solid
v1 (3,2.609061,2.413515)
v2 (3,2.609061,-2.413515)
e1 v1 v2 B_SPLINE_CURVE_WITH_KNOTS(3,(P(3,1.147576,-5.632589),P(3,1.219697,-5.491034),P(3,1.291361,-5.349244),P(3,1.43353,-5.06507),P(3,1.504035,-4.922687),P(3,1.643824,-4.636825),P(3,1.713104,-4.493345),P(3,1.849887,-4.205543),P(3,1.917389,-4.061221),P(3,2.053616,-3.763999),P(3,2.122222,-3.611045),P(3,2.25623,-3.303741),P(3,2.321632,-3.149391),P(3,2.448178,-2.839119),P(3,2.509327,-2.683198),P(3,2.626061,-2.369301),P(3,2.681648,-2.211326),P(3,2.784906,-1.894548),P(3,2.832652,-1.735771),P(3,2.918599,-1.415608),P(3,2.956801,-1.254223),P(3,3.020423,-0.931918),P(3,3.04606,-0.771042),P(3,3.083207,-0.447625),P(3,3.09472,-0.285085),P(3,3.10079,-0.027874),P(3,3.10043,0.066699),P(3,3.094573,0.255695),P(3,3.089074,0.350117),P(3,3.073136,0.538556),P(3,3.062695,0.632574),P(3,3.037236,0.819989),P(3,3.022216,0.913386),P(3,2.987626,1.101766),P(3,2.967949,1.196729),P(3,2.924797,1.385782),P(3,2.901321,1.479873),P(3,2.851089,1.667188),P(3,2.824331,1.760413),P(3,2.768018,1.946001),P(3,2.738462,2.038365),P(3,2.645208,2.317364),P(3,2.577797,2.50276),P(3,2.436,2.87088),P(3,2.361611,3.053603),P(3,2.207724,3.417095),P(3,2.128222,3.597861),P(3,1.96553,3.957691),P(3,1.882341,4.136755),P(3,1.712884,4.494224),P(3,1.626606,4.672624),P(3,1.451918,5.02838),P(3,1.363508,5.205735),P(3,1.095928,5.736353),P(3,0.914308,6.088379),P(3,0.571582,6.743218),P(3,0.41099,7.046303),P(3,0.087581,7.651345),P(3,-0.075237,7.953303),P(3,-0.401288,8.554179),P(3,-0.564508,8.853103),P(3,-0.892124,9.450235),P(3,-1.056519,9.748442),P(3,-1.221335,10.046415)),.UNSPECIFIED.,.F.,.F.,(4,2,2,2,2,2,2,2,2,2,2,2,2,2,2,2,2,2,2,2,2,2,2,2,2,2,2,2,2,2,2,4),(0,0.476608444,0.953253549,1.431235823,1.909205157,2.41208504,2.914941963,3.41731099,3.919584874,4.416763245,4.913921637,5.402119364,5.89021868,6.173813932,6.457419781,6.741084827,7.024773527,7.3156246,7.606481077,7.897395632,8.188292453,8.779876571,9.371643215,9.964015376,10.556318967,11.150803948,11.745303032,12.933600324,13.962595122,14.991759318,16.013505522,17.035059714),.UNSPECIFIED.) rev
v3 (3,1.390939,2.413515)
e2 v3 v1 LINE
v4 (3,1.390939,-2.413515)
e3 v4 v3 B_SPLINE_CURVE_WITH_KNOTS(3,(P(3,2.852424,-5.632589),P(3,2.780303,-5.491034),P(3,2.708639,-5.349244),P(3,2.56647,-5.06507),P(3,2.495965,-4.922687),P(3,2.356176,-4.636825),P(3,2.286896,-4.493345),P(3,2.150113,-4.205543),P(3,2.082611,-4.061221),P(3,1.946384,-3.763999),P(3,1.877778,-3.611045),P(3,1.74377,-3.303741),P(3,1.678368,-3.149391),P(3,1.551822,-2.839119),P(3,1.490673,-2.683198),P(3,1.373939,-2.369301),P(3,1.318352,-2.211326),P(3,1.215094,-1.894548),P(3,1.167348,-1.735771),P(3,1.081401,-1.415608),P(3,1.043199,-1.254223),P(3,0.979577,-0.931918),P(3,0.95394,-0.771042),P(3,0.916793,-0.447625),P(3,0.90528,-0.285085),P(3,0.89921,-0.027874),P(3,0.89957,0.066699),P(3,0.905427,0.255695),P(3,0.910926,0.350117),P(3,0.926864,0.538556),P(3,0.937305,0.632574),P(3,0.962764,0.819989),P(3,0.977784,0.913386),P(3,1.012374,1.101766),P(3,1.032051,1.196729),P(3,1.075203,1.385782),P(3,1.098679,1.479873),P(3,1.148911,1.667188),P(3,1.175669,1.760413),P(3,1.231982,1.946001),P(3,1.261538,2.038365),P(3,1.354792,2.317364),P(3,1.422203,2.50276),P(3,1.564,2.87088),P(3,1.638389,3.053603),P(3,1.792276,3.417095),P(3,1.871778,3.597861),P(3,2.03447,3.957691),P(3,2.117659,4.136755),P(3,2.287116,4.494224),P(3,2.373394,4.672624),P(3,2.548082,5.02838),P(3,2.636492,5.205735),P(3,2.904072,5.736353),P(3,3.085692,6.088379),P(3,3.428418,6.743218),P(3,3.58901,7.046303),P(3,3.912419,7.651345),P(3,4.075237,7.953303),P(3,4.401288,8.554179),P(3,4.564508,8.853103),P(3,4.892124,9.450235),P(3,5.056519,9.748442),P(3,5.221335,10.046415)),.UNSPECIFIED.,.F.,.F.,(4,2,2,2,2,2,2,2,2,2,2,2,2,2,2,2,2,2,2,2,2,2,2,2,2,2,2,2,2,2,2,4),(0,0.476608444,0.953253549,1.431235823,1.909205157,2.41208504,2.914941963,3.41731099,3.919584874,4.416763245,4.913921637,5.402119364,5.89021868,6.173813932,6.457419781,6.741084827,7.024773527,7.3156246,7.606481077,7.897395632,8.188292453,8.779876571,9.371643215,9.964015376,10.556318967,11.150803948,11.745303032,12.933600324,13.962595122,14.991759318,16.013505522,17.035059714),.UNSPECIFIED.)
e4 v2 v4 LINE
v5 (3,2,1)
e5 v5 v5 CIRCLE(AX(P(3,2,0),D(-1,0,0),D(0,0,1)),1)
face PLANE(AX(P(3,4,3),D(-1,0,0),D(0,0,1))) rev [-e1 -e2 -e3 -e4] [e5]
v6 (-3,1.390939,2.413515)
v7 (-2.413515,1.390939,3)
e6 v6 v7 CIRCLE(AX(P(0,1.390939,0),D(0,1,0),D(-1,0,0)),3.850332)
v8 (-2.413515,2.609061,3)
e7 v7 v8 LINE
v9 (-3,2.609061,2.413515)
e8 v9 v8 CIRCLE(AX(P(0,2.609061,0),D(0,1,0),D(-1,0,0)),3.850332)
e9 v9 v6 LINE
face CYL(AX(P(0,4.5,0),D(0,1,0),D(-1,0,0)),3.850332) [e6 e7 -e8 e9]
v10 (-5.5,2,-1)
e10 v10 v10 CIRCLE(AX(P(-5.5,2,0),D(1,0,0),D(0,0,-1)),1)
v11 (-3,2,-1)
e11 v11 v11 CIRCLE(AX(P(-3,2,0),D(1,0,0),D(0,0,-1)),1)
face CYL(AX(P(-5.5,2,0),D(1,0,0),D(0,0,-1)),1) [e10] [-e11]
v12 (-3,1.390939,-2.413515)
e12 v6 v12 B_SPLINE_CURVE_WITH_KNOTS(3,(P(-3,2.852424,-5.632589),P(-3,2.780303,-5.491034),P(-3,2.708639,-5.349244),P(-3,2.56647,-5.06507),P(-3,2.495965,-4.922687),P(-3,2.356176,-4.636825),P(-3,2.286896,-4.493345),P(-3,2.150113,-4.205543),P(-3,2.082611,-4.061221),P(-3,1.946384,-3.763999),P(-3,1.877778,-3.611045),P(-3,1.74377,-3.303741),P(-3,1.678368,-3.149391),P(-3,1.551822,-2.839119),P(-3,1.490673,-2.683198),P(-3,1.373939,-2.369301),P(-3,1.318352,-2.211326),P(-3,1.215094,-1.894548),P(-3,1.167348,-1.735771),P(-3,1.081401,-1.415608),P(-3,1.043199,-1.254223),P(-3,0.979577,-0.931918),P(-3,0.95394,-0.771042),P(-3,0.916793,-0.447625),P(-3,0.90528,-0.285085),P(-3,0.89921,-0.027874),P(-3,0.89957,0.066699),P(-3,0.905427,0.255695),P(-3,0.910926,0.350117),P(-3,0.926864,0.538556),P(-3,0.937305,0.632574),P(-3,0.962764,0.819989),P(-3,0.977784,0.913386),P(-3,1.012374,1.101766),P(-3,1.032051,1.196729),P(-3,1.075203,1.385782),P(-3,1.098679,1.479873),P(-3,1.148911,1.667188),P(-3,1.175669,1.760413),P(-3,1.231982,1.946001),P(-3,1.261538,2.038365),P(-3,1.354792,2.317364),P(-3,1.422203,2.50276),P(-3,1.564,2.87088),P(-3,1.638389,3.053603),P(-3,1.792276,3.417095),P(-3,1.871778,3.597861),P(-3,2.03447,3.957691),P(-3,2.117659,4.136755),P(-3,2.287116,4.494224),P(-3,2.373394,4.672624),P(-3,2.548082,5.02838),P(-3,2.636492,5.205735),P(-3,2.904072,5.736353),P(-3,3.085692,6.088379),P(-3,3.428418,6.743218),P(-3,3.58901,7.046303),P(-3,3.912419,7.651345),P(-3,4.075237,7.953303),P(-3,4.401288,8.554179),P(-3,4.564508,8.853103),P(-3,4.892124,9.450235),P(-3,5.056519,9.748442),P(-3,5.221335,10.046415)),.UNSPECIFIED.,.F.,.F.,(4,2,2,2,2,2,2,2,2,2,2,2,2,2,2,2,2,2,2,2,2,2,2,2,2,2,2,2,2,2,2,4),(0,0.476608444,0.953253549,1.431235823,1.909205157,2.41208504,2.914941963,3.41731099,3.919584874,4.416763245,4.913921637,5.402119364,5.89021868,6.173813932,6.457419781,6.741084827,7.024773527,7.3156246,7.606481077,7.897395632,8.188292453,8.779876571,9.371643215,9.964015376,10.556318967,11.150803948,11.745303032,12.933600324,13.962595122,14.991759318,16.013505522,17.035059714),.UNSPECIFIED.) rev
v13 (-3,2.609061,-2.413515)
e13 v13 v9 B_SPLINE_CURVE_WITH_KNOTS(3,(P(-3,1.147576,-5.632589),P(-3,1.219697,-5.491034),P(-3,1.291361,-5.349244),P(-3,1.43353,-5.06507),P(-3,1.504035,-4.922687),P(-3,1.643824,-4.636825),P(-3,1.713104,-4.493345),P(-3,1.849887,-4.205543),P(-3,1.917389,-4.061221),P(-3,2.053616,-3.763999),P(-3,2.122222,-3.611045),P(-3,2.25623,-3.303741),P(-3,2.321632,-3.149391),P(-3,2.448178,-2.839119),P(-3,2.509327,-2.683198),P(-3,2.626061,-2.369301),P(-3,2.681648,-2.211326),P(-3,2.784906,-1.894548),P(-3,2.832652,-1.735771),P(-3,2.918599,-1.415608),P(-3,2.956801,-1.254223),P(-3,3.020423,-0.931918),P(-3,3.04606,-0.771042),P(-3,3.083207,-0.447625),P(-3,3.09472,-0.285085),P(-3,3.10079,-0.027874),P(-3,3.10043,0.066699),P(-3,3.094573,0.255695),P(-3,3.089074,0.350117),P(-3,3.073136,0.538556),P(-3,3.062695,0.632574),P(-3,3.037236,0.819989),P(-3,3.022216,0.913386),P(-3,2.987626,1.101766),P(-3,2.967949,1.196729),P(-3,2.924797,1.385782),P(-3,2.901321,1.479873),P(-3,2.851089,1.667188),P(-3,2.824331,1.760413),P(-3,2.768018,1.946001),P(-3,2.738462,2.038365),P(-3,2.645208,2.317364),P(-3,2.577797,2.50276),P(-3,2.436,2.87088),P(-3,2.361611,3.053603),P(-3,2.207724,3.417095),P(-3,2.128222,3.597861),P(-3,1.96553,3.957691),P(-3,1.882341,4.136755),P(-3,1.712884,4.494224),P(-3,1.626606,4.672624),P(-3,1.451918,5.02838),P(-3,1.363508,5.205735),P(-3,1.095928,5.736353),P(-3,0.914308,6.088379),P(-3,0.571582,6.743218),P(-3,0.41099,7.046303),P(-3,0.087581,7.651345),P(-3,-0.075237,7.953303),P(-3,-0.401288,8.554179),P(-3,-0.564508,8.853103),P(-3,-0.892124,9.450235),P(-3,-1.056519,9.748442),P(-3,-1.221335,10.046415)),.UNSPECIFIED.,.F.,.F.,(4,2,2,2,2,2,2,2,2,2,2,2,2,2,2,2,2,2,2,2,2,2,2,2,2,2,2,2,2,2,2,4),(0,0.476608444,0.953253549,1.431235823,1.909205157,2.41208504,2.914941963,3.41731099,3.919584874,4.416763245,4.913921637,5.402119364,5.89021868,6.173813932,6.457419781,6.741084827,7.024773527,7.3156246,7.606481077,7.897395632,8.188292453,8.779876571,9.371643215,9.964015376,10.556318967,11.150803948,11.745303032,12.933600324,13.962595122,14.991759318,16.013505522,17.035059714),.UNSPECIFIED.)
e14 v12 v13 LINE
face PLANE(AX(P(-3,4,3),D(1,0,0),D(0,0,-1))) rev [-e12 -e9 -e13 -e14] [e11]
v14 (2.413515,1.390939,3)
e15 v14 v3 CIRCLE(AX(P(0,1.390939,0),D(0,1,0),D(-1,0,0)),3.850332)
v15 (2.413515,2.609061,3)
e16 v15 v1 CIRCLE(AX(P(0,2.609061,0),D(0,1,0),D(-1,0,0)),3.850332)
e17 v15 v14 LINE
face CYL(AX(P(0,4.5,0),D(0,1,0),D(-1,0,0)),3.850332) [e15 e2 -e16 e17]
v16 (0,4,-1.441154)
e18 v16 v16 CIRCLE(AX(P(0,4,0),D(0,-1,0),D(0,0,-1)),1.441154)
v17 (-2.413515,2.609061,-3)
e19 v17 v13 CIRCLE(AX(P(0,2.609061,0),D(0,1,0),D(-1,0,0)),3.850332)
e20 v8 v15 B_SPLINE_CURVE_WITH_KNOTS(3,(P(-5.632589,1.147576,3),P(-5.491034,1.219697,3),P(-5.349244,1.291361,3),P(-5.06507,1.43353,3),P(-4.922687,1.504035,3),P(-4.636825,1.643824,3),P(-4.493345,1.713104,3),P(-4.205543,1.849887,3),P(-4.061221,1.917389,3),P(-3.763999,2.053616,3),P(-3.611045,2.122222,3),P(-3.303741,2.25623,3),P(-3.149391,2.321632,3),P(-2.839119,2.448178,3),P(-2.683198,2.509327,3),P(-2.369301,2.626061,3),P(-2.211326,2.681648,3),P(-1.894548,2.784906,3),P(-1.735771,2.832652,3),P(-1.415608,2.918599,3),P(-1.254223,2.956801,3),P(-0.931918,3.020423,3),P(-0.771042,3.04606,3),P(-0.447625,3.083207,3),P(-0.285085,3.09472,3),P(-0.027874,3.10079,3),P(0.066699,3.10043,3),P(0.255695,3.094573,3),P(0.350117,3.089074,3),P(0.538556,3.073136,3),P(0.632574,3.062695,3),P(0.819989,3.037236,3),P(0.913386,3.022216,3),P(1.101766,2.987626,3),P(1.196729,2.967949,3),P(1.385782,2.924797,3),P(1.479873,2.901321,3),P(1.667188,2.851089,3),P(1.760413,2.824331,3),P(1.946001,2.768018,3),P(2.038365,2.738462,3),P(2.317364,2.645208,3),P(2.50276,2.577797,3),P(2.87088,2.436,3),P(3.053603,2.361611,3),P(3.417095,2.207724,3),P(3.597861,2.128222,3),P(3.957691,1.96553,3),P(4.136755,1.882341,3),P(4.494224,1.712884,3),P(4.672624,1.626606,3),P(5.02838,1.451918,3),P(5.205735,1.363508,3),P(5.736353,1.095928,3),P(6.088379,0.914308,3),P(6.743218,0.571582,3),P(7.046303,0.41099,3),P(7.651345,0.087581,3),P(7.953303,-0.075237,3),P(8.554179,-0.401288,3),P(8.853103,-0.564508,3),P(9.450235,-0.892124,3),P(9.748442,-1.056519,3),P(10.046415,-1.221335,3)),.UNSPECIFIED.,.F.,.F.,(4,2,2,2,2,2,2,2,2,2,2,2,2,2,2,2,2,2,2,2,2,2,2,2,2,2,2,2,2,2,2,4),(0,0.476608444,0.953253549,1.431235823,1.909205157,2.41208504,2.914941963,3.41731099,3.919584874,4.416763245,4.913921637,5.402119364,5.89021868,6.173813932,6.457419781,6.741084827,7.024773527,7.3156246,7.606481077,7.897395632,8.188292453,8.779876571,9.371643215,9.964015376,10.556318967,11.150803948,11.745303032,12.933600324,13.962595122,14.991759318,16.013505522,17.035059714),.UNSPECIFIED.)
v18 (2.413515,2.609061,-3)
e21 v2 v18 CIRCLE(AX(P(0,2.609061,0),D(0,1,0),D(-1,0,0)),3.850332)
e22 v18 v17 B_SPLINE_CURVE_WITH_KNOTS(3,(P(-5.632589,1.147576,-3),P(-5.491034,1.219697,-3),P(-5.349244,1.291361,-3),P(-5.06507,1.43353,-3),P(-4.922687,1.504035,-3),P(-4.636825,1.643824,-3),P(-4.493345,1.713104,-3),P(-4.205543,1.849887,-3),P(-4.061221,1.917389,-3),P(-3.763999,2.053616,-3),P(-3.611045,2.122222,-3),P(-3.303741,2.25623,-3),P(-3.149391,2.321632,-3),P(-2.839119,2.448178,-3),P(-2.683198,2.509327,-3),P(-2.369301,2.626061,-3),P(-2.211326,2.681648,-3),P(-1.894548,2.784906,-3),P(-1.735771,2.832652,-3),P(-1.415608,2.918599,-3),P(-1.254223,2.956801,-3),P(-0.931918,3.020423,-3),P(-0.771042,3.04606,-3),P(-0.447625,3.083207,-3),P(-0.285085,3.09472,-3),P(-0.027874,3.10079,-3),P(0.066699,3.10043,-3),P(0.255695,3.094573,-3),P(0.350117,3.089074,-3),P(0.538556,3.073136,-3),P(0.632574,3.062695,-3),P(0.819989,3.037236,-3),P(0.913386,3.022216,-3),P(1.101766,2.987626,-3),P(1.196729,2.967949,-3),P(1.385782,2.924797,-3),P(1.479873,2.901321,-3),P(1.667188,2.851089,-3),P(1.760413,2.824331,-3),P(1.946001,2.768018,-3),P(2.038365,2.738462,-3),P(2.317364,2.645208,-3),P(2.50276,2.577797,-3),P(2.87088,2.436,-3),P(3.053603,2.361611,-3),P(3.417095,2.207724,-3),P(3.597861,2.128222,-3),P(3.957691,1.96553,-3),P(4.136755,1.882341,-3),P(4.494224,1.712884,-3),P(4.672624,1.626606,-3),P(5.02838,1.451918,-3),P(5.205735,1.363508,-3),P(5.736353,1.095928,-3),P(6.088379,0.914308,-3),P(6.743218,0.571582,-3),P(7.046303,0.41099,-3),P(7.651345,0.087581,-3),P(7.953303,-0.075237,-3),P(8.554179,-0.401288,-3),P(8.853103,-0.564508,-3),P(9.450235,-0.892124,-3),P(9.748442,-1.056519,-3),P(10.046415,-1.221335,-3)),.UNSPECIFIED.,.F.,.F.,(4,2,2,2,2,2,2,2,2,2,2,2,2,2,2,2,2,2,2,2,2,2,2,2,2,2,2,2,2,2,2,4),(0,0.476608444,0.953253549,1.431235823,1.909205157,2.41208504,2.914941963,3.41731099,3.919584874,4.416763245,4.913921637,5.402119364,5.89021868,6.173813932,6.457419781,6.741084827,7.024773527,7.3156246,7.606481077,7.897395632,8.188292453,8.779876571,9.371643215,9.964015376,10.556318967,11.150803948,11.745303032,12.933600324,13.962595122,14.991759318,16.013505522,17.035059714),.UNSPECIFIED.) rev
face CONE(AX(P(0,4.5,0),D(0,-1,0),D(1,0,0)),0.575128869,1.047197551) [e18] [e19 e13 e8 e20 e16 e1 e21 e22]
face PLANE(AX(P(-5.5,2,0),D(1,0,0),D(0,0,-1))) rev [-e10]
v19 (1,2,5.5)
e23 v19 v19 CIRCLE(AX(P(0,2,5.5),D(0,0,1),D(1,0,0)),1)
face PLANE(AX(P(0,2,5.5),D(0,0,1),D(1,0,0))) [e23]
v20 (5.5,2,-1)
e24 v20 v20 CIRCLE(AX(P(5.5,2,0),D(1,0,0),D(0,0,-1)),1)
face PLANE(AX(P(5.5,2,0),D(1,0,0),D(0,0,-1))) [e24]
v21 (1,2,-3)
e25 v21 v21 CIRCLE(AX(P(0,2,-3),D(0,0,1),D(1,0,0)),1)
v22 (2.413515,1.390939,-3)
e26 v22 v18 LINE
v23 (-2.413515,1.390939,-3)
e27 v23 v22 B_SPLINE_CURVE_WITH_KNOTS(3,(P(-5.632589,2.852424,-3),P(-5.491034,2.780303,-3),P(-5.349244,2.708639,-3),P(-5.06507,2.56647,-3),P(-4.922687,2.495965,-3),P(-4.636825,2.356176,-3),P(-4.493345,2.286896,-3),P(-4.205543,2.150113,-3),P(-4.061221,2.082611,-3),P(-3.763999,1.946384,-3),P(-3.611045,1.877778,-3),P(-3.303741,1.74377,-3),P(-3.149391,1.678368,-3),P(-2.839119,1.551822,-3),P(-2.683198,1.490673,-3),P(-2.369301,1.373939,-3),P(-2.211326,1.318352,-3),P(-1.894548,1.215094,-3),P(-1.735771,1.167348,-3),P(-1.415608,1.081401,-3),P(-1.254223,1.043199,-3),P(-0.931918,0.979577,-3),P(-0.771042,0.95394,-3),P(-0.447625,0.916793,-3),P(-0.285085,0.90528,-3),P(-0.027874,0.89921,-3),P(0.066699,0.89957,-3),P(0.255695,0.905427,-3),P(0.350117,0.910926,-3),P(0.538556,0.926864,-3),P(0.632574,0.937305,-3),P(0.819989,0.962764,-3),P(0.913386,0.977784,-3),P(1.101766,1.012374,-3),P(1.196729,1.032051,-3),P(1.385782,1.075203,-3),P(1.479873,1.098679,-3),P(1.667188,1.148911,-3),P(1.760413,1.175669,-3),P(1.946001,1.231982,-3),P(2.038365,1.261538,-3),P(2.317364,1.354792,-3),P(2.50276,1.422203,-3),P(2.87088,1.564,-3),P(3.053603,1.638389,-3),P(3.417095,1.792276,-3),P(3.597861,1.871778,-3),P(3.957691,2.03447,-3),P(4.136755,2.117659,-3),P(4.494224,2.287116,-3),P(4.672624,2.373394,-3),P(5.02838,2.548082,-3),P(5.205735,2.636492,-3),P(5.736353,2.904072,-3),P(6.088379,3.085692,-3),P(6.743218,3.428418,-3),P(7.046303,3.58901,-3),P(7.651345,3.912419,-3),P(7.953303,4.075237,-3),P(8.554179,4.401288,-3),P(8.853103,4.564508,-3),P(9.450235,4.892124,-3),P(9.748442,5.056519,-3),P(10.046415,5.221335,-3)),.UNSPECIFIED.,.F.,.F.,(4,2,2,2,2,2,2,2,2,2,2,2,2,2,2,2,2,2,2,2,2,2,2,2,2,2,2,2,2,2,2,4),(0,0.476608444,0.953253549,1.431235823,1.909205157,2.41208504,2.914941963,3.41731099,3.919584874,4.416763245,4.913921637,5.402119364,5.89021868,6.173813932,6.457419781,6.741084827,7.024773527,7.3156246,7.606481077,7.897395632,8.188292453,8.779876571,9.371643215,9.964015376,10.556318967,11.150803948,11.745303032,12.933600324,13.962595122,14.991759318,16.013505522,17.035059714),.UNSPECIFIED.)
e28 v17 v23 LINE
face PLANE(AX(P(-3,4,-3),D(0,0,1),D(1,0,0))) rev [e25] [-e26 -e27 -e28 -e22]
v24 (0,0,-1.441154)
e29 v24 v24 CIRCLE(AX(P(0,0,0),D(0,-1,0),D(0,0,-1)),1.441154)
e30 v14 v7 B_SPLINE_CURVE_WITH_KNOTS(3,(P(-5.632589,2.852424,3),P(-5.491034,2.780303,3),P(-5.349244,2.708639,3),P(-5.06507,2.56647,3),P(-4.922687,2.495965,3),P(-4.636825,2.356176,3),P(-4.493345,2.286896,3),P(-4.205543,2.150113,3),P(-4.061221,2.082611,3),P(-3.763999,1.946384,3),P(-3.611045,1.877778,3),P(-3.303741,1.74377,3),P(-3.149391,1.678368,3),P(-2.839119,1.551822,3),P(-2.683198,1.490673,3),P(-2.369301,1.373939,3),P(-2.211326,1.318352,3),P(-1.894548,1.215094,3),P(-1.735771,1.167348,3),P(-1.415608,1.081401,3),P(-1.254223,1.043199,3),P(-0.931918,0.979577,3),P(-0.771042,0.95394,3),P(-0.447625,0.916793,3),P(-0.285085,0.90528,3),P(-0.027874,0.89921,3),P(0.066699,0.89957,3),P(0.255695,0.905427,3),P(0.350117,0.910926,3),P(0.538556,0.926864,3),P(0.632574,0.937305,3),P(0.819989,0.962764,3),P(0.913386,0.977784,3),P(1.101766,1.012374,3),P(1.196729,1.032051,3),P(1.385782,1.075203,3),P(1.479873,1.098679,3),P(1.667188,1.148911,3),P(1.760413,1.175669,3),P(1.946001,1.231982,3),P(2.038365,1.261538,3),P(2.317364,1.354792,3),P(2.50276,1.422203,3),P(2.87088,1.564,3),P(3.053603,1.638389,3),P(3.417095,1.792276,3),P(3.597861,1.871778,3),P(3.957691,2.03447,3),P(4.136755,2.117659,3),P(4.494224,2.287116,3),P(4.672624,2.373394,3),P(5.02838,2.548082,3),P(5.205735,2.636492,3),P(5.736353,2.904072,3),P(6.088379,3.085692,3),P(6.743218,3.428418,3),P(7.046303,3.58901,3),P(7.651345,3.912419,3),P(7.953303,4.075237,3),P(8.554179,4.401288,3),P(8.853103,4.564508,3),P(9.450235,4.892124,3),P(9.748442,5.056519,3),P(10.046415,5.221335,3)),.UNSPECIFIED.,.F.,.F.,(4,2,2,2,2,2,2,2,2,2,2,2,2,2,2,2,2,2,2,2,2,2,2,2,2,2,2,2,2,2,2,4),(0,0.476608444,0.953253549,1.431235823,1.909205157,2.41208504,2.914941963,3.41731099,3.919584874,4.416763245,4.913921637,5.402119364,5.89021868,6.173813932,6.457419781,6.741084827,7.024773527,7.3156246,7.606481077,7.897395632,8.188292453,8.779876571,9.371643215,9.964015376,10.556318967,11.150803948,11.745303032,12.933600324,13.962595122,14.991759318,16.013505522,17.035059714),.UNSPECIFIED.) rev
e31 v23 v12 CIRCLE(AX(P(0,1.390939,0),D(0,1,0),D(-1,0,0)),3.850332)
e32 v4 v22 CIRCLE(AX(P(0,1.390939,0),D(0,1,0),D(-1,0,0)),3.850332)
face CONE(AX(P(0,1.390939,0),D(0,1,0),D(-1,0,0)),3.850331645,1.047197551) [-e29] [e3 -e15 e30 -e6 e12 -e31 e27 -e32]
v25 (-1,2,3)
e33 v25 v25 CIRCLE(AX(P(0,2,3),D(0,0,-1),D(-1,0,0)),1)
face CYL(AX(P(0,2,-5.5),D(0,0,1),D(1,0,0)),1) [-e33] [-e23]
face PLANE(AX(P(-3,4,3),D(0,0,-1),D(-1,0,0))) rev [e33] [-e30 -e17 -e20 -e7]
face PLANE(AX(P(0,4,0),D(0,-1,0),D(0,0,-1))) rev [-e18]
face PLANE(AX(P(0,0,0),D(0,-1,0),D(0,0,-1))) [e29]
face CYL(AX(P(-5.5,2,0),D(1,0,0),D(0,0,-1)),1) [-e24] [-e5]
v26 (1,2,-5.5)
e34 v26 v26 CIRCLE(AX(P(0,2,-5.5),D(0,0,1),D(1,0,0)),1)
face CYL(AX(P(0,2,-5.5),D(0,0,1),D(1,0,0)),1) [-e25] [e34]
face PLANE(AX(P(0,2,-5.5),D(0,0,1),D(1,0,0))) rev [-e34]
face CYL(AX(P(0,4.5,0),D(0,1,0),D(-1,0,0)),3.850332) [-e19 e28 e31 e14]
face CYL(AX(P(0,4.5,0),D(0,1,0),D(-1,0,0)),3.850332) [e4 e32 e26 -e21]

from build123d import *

# Parameters (mm, degrees)
SKETCH1_W                = 6
SKETCH1_H                = 6
BOSS_EXTRUDE1_DEPTH      = 4
CUT_REVOLVE_THIN1_DEPTH  = 4
BOSS_EXTRUDE2_DEPTH      = 5.5
BOSS_EXTRUDE2_DEPTH_BACK = 5.5
SKETCH3_R                = 1
BOSS_EXTRUDE3_DEPTH      = 5.5
BOSS_EXTRUDE3_DEPTH_BACK = 5.5
SKETCH4_R                = 1


with BuildPart() as part:
    # Sketch1 → Boss-Extrude1 (new body)
    with BuildSketch(Plane(origin=(0, 0, 0), x_dir=(1, 0, 0), z_dir=(0, 1, 0))):
        Rectangle(SKETCH1_W, SKETCH1_H)
    extrude(amount=BOSS_EXTRUDE1_DEPTH)

    # Cut-Revolve-Thin1: read off the stored shape, not the designer's step
    # Cut-Revolve-Thin1 outline → Cut-Revolve-Thin1 (cut)
    with BuildSketch(Plane(origin=(0, 0, 0), x_dir=(1, 0, 0), z_dir=(0, 1, 0))):
        with BuildLine():
            ThreePointArc((3, -2.413514817), (2.722595616, -2.722595616), (2.413514817, -3))
            Line((2.413514817, -3), (3, -3))
            Line((3, -3), (3, -2.413514817))
        make_face()
        with BuildLine():
            Line((-3, -3), (-2.413514817, -3))
            ThreePointArc((-2.413514817, -3), (-2.722595616, -2.722595616), (-3, -2.413514817))
            Line((-3, -2.413514817), (-3, -3))
        make_face()
        with BuildLine():
            ThreePointArc((2.413514817, 3), (2.722595616, 2.722595616), (3, 2.413514817))
            Line((3, 2.413514817), (3, 3))
            Line((3, 3), (2.413514817, 3))
        make_face()
        with BuildLine():
            Line((-3, 3), (-3, 2.413514817))
            ThreePointArc((-3, 2.413514817), (-2.722595616, 2.722595616), (-2.413514817, 3))
            Line((-2.413514817, 3), (-3, 3))
        make_face()
    extrude(amount=CUT_REVOLVE_THIN1_DEPTH, mode=Mode.SUBTRACT)

    # Cut-Revolve-Thin1 2 outline → Cut-Revolve-Thin1 2 (revolve, cut)
    with BuildSketch(Plane.XY):
        Polygon((3.850331645, 4), (1.441154273, 4), (3.850331645, 2.609060796), align=None)
        Polygon((3.850331645, 0), (3.850331645, 1.390939204), (1.441154273, 0), align=None)
    revolve(axis=Axis((0, 0, 0), (0, 1, 0)), mode=Mode.SUBTRACT)

    # Sketch3 → Boss-Extrude2 (add, two sides: drawn at the far end of the back side and taken through both)
    with BuildSketch(Plane.XY.offset(-BOSS_EXTRUDE2_DEPTH_BACK)):
        with Locations((0, 2)):
            Circle(SKETCH3_R)
    extrude(amount=BOSS_EXTRUDE2_DEPTH + BOSS_EXTRUDE2_DEPTH_BACK)

    # Sketch4 → Boss-Extrude3 (add, two sides: drawn at the far end of the back side and taken through both)
    with BuildSketch(Plane(origin=(0, 0, 0), x_dir=(0, 0, -1), z_dir=(1, 0, 0)).offset(-BOSS_EXTRUDE3_DEPTH_BACK)):
        with Locations((0, 2)):
            Circle(SKETCH4_R)
    extrude(amount=BOSS_EXTRUDE3_DEPTH + BOSS_EXTRUDE3_DEPTH_BACK)


solid = part.part
